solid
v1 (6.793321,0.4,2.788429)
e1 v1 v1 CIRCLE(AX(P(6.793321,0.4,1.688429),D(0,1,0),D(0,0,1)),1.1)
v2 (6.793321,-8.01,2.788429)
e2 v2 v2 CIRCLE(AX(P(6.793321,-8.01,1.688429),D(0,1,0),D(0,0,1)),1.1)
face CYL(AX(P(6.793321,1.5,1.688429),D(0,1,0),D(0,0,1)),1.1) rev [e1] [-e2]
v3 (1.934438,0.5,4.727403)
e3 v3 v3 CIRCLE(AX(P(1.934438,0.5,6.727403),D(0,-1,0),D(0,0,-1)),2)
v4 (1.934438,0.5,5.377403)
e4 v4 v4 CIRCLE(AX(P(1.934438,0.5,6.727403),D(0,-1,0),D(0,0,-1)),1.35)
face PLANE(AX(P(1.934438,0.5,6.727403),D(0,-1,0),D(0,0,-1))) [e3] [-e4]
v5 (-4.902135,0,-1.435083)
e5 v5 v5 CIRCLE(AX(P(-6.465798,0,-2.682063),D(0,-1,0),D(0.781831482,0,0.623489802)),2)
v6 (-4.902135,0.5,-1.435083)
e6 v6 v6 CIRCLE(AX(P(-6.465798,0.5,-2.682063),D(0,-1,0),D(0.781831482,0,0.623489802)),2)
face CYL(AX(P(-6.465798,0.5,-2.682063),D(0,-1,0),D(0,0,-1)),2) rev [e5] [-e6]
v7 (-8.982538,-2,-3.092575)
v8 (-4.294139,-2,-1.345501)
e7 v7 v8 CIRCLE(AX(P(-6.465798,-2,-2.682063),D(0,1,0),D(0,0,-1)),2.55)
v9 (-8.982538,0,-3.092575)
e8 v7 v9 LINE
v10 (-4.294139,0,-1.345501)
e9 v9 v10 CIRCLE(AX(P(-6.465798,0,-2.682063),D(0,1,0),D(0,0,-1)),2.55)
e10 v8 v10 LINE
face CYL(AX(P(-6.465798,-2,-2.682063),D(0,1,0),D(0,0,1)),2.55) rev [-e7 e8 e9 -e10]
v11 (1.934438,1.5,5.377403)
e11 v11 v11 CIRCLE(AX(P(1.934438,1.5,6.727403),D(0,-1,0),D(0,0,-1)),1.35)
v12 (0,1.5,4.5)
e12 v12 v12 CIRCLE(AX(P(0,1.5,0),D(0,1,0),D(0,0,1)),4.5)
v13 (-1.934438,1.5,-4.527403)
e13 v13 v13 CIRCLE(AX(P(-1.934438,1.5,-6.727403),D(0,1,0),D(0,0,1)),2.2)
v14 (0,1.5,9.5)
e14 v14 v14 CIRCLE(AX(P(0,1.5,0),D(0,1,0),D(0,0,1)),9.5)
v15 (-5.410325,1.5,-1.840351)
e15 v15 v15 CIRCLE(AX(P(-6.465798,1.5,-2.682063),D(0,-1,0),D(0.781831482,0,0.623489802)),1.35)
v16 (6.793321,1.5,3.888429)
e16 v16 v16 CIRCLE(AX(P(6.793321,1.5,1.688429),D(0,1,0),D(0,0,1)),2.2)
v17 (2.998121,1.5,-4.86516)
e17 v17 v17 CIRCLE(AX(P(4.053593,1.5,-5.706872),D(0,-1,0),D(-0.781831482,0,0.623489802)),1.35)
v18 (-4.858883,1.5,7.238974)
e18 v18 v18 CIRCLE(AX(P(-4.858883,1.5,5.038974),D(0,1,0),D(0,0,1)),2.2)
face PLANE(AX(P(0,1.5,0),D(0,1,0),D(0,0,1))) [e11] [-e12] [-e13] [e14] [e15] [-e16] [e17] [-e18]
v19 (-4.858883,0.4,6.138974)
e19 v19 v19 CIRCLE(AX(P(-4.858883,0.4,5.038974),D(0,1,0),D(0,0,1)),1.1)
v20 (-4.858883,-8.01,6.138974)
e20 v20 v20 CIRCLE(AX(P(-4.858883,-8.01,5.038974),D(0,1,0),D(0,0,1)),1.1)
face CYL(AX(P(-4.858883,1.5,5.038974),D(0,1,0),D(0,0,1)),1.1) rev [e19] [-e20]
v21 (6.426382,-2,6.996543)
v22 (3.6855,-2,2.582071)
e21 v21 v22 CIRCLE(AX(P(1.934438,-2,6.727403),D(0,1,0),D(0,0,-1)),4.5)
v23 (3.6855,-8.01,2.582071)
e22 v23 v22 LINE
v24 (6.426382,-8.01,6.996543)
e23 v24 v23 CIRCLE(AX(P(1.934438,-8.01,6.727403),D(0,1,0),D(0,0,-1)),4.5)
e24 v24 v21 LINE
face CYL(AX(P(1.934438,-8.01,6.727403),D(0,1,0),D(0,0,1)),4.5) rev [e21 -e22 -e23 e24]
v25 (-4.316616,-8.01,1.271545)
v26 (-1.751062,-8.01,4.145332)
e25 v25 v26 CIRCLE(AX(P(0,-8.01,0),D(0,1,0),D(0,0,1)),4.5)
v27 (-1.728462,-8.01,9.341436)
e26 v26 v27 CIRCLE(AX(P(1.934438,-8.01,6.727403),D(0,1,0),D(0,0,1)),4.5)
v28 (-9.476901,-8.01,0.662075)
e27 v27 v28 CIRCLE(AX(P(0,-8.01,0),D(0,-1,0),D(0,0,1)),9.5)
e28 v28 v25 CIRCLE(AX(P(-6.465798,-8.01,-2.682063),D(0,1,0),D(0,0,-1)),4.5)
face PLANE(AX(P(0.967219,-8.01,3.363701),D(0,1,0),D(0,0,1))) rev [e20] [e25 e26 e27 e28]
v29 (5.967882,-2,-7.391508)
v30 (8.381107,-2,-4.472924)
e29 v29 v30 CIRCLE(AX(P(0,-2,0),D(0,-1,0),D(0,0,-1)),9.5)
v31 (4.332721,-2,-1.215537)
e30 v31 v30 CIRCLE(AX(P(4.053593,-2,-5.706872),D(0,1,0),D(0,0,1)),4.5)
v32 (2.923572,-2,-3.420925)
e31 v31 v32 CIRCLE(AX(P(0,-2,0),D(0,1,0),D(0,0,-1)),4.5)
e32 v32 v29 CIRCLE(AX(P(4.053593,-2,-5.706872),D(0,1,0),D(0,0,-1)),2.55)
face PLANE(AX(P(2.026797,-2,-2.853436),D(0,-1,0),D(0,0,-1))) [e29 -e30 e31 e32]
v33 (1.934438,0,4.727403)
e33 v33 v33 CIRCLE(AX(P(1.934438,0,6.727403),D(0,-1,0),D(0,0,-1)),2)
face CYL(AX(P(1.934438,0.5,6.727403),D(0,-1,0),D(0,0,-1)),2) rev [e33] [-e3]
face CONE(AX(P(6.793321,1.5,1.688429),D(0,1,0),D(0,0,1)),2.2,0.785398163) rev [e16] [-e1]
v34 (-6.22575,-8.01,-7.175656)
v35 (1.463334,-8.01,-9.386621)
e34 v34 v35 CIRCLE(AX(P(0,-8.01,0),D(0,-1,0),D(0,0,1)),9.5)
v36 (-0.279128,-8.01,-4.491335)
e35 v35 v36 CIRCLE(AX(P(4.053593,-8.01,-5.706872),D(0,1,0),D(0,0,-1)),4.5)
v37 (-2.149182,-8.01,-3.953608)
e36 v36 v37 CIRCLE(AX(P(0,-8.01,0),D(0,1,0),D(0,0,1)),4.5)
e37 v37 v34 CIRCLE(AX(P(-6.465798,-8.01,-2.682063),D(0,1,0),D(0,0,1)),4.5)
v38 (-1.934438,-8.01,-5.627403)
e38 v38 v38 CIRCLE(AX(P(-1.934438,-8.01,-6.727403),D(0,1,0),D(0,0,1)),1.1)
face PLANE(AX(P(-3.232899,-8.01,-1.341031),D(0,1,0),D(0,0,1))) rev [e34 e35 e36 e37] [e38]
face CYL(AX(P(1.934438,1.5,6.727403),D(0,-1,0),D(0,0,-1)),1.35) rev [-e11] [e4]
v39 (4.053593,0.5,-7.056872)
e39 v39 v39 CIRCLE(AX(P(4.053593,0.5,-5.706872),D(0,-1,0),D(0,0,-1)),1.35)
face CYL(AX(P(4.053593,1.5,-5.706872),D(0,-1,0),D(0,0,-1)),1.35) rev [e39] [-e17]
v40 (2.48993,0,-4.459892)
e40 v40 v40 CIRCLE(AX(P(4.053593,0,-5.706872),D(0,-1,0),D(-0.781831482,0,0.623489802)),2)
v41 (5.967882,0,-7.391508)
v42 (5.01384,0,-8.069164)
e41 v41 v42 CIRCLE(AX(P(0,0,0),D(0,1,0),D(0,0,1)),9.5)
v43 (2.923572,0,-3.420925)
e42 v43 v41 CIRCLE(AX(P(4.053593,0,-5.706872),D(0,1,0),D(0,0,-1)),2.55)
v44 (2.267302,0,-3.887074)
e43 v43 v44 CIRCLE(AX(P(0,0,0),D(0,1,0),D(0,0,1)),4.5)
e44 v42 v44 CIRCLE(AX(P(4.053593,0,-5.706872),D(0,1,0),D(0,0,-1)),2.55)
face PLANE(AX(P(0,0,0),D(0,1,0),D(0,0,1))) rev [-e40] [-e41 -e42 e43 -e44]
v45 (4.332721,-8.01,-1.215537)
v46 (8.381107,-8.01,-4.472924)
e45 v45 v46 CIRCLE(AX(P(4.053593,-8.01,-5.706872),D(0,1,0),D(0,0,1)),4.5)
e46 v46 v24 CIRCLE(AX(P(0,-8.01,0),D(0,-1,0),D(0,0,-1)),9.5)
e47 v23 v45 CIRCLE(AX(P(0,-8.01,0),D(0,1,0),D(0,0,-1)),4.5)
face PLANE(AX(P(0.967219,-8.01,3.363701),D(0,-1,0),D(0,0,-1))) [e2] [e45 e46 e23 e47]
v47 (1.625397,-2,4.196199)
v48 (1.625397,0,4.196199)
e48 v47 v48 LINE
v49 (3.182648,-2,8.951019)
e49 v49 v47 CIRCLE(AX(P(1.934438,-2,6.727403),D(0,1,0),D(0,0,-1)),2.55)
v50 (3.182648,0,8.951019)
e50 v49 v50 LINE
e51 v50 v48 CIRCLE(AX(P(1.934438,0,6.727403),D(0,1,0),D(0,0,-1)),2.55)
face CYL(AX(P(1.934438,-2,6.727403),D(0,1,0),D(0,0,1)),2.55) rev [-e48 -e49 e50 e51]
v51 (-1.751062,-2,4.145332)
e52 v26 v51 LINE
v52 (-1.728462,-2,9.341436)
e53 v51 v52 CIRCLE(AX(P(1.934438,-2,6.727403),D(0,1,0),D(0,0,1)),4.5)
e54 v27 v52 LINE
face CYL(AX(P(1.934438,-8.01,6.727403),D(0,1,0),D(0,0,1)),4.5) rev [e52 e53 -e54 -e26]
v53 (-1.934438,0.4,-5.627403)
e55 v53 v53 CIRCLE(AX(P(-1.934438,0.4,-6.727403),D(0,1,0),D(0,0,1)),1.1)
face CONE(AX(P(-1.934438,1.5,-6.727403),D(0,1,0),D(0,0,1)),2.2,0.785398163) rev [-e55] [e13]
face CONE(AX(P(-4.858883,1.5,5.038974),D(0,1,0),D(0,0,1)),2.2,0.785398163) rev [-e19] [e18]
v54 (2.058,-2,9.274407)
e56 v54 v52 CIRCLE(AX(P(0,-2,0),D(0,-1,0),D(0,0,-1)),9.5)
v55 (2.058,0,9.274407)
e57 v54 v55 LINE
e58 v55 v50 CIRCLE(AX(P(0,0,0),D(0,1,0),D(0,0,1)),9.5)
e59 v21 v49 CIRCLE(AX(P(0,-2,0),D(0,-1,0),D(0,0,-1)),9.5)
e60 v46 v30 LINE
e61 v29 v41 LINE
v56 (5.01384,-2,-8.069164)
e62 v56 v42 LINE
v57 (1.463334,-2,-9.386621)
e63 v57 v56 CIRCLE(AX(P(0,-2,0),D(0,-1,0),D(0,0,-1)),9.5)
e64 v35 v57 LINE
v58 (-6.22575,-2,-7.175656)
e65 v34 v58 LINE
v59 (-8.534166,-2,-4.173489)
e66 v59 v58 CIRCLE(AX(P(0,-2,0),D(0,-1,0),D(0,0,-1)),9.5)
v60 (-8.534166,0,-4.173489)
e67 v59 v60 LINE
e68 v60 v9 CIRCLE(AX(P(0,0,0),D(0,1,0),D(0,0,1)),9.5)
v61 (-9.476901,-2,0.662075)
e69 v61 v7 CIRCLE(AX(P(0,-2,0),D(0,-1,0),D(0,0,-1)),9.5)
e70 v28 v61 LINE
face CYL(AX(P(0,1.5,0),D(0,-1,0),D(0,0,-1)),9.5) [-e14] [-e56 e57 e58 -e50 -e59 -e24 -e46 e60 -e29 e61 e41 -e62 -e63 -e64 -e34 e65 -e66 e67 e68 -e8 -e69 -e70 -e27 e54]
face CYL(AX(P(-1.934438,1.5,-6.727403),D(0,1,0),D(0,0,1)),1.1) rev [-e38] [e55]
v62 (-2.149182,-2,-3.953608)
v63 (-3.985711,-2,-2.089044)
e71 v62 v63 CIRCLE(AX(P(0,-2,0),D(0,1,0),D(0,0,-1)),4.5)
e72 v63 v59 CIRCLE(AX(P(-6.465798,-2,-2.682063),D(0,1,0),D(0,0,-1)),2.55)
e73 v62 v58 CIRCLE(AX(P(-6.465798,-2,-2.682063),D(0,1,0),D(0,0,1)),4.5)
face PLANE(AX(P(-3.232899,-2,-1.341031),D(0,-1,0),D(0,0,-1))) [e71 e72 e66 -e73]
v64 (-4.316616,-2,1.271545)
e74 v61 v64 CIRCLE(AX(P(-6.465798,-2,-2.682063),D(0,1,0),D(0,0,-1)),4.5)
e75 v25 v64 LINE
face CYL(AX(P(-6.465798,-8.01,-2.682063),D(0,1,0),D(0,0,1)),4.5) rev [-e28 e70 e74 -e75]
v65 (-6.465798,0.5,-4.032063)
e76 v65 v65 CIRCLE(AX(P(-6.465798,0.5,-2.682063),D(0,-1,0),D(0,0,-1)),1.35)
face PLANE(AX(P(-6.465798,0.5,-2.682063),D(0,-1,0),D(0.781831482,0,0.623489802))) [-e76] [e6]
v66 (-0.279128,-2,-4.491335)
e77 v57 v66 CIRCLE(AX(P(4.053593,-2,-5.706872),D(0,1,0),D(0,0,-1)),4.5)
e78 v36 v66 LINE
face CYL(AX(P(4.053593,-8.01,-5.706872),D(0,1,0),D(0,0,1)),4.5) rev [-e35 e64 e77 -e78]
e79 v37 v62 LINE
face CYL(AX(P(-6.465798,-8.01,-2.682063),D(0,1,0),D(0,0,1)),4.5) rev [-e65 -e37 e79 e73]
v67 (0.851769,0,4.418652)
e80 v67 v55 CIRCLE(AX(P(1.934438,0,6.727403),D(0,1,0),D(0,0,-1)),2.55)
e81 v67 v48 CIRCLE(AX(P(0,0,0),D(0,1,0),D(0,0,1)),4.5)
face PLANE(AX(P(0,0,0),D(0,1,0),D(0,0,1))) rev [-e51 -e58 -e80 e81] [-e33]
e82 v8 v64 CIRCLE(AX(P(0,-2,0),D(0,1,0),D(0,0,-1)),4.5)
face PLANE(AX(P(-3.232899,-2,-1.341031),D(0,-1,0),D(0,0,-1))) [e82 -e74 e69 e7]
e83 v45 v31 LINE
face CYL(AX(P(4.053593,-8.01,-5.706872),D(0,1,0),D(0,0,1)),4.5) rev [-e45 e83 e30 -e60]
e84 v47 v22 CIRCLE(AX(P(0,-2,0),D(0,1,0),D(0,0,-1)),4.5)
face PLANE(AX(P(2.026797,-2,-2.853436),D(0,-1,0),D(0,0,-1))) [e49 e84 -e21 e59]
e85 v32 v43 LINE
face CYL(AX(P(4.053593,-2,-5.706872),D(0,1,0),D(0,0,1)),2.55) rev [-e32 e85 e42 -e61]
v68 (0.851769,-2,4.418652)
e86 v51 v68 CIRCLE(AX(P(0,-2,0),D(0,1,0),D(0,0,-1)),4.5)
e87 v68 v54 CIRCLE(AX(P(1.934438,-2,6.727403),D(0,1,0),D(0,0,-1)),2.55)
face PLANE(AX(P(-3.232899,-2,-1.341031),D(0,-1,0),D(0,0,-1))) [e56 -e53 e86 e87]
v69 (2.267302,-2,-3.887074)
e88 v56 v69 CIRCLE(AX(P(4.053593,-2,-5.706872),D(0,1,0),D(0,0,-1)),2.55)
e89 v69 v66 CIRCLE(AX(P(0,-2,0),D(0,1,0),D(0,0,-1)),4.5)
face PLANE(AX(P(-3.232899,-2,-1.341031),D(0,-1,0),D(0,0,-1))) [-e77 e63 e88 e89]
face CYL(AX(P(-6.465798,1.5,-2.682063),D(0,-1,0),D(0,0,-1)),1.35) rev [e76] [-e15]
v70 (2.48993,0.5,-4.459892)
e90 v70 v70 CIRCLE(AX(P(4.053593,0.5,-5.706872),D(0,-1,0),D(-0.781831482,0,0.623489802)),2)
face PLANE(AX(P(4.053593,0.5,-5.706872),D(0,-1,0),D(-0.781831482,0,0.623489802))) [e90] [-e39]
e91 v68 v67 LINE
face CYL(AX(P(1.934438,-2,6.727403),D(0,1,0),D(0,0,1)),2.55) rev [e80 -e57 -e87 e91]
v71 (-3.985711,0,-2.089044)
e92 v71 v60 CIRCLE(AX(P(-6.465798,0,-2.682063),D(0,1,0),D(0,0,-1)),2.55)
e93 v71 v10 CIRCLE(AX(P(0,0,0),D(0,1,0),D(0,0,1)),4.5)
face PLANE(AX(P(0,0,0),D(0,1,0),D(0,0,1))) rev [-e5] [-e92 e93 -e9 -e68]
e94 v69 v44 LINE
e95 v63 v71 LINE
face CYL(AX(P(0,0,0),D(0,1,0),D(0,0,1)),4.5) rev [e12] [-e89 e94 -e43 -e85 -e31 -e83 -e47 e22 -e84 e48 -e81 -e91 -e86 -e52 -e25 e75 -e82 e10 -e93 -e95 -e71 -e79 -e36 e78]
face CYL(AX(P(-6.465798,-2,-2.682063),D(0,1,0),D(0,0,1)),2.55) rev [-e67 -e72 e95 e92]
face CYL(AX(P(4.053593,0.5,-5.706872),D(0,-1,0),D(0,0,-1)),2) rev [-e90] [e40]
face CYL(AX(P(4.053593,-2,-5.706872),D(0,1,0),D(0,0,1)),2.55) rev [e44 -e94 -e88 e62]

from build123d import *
from build123d.topology import SkipClean

# Parameters (mm, degrees)
SKETCH1_R                                       = 9.5
BOSS_EXTRUDE1_DEPTH                             = 1.5
SKETCH2_R                                       = 4.5
CUT_EXTRUDE1_DEPTH                              = 14.518505835
SKETCH3_R                                       = 2
CUT_EXTRUDE5_DEPTH                              = 0.5
SKETCH4_R                                       = 1.35
CUT_EXTRUDE6_DEPTH                              = 14.518505835
BOSS_EXTRUDE2_DEPTH                             = 2
CIRPATTERN1_OUTLINE_R                           = 1.35
CIRPATTERN1_DEPTH                               = 1.5
CIRPATTERN1_2_OUTLINE_R                         = 2
CIRPATTERN1_2_OUTLINE_R_2                       = 1.35
CIRPATTERN1_2_DEPTH                             = 0.5
BOSS_EXTRUDE3_DEPTH                             = 6.01
CSK_FOR_M2_FLAT_HEAD_MACHINE_SCREW1_D           = 2.2
CSK_FOR_M2_FLAT_HEAD_MACHINE_SCREW1_CSINK_D     = 4.4
CSK_FOR_M2_FLAT_HEAD_MACHINE_SCREW1_CSINK_ANGLE = 90


# Read off the part's stored shape, not the designer's step: CirPattern1, CirPattern2
with BuildPart() as part:
    # Sketch1 → Boss-Extrude1 (new body)
    with BuildSketch(Plane(origin=(0, 0, 0), x_dir=(1, 0, 0), z_dir=(0, 1, 0))):
        with Locations(Location((0, 0, 0), (0, 0, 270))):
            Circle(SKETCH1_R)
    extrude(amount=BOSS_EXTRUDE1_DEPTH)

    # Sketch2 → Cut-Extrude1 (cut, through all)
    with BuildSketch(Plane(origin=(0, 1.5, 0), x_dir=(1, 0, 0), z_dir=(0, 1, 0))):
        with Locations(Location((0, 0, 0), (0, 0, 270))):
            Circle(SKETCH2_R)
    extrude(amount=-CUT_EXTRUDE1_DEPTH, mode=Mode.SUBTRACT)

    # Sketch3 → Cut-Extrude5 (cut)
    with BuildSketch(Plane.XZ):
        with Locations(Location((1.93443789, 6.72740292, 0), (0, 0, 270))):
            Circle(SKETCH3_R)
    extrude(amount=-CUT_EXTRUDE5_DEPTH, mode=Mode.SUBTRACT)

    # Sketch4 → Cut-Extrude6 (cut, through all)
    with BuildSketch(Plane.XZ):
        with Locations(Location((1.93443789, 6.72740292, 0), (0, 0, 270))):
            Circle(SKETCH4_R)
    extrude(amount=-CUT_EXTRUDE6_DEPTH, mode=Mode.SUBTRACT)

    # Sketch5 → Boss-Extrude2 (add)
    with SkipClean():  # the faces are left unmerged after this step: merging them gives an invalid solid
        with BuildSketch(Plane.XZ):
            with BuildLine():
                ThreePointArc((3.182648464, 8.951019425), (4.357780459, 5.933733723), (1.625396676, 4.196198952))
                ThreePointArc((1.625396676, 4.196198952), (4.436036831, 0.756027269), (2.92357195, -3.420924883))
                ThreePointArc((2.92357195, -3.420924883), (6.077241126, -4.155308257), (5.967881507, -7.391507987))
                ThreePointArc((5.967881507, -7.391507987), (9.364966644, 1.596057567), (3.182648464, 8.951019425))
            make_face()
            with BuildLine():
                ThreePointArc((0.851769477, 4.418652369), (-0.540347051, 7.342170761), (2.058000389, 9.274407496))
                ThreePointArc((2.058000389, 9.274407496), (-7.086809251, 6.326700138), (-8.982537647, -3.092574561))
                ThreePointArc((-8.982537647, -3.092574561), (-7.356211508, -0.292572507), (-4.294138699, -1.34550096))
                ThreePointArc((-4.294138699, -1.34550096), (-3.356909645, 2.99685796), (0.851769477, 4.418652369))
            make_face()
            with BuildLine():
                ThreePointArc((-8.534166016, -4.173488997), (-2.625308565, -9.13004682), (5.013839927, -8.069164095))
                ThreePointArc((5.013839927, -8.069164095), (1.922148158, -7.106672419), (2.267302196, -3.887073546))
                ThreePointArc((2.267302196, -3.887073546), (-1.243567215, -4.32475902), (-3.985711115, -2.089044497))
                ThreePointArc((-3.985711115, -2.089044497), (-5.403439375, -5.000228929), (-8.534166016, -4.173488997))
            make_face()
        extrude(amount=BOSS_EXTRUDE2_DEPTH)

    # CirPattern1 outline → CirPattern1 (cut)
    with SkipClean():  # the faces are left unmerged after this step: merging them gives an invalid solid
        with BuildSketch(Plane(origin=(0, 0, 0), x_dir=(1, 0, 0), z_dir=(0, 1, 0))):
            with Locations((4.053593102, 5.706871557)):
                Circle(CIRPATTERN1_OUTLINE_R)
            with Locations((-6.465797695, 2.68206267)):
                Circle(CIRPATTERN1_OUTLINE_R)
        extrude(amount=CIRPATTERN1_DEPTH, mode=Mode.SUBTRACT)

    # CirPattern1 2 outline → CirPattern1 2 (cut)
    # profile 1 of 2: a face of its own
    with SkipClean():  # the faces are left unmerged after this step: merging them gives an invalid solid
        with BuildSketch(Plane(origin=(0, 0, 0), x_dir=(1, 0, 0), z_dir=(0, 1, 0))):
            with Locations((-6.465797695, 2.68206267)):
                Circle(CIRPATTERN1_2_OUTLINE_R)
            with Locations((-6.465797695, 2.68206267)):
                Circle(CIRPATTERN1_2_OUTLINE_R_2, mode=Mode.SUBTRACT)
        # profile 2 of 2: a face of its own
        with BuildSketch(Plane(origin=(0, 0, 0), x_dir=(1, 0, 0), z_dir=(0, 1, 0))):
            with Locations((4.053593102, 5.706871557)):
                Circle(CIRPATTERN1_2_OUTLINE_R)
            with Locations((4.053593102, 5.706871557)):
                Circle(CIRPATTERN1_2_OUTLINE_R_2, mode=Mode.SUBTRACT)
        extrude(amount=CIRPATTERN1_2_DEPTH, mode=Mode.SUBTRACT)

    # Sketch9 → Boss-Extrude3 (add)
    with SkipClean():  # the faces are left unmerged after this step: merging them gives an invalid solid
        with BuildSketch(Plane.XZ.offset(2)):
            with BuildLine():
                ThreePointArc((-9.476901231, 0.662074811), (-6.993614762, 1.786875586), (-4.31661582, 1.271545462))
                ThreePointArc((-4.31661582, 1.271545462), (-3.356909645, 2.99685796), (-1.751062326, 4.145332403))
                ThreePointArc((-1.751062326, 4.145332403), (-2.565519544, 6.746975713), (-1.728461612, 9.341435674))
                ThreePointArc((-1.728461612, 9.341435674), (-7.086809251, 6.326700138), (-9.476901231, 0.662074811))
            make_face()
            with BuildLine():
                ThreePointArc((6.426382202, 6.996542846), (5.757483071, 4.353729492), (3.685500216, 2.582070517))
                ThreePointArc((3.685500216, 2.582070517), (4.436036831, 0.756027269), (4.332720881, -1.215536824))
                ThreePointArc((4.332720881, -1.215536824), (6.874573296, -2.200866602), (8.38110669, -4.472924173))
                ThreePointArc((8.38110669, -4.472924173), (9.364966644, 1.596057567), (6.426382202, 6.996542846))
            make_face()
            with BuildLine():
                ThreePointArc((1.4633337, -9.386621036), (-0.185849196, -7.215887463), (-0.279127779, -4.491334733))
                ThreePointArc((-0.279127779, -4.491334733), (-1.243567215, -4.32475902), (-2.149181875, -3.953608133))
                ThreePointArc((-2.149181875, -3.953608133), (-3.675422752, -6.212474499), (-6.225750314, -7.175655582))
                ThreePointArc((-6.225750314, -7.175655582), (-2.625308565, -9.13004682), (1.4633337, -9.386621036))
            make_face()
        extrude(amount=BOSS_EXTRUDE3_DEPTH)

    # CSK for M2 Flat Head Machine Screw1 (through all)
    with Locations(Plane(origin=(0, 1.5, 0), x_dir=(1, 0, 0), z_dir=(0, 1, 0))):
        with Locations((-1.93443789, 6.72740292)):
            CounterSinkHole(CSK_FOR_M2_FLAT_HEAD_MACHINE_SCREW1_D / 2, CSK_FOR_M2_FLAT_HEAD_MACHINE_SCREW1_CSINK_D / 2, counter_sink_angle=CSK_FOR_M2_FLAT_HEAD_MACHINE_SCREW1_CSINK_ANGLE)

    # CirPattern2 outline → CirPattern2 (revolve, cut)
    with SkipClean():  # the faces are left unmerged after this step: merging them gives an invalid solid
        with BuildSketch(Plane(origin=(6.793320775, 0, 1.688429105), x_dir=(1, 0, 0), z_dir=(0, 0, 1))):
            Polygon((0, -8.01), (1.1, -8.01), (1.1, 0.4), (2.2, 1.5), (0, 1.5), align=None)
        revolve(axis=Axis((6.793320775, 0, 1.688429105), (0, 1, 0)), mode=Mode.SUBTRACT)

    # CirPattern2 2 outline → CirPattern2 2 (revolve, cut)
    with SkipClean():  # the faces are left unmerged after this step: merging them gives an invalid solid
        with BuildSketch(Plane(origin=(-4.858882885, 0, 5.038973815), x_dir=(1, 0, 0), z_dir=(0, 0, 1))):
            Polygon((0, -8.01), (1.1, -8.01), (1.1, 0.4), (2.2, 1.5), (0, 1.5), align=None)
        revolve(axis=Axis((-4.858882885, 0, 5.038973815), (0, 1, 0)), mode=Mode.SUBTRACT)


solid = part.part
